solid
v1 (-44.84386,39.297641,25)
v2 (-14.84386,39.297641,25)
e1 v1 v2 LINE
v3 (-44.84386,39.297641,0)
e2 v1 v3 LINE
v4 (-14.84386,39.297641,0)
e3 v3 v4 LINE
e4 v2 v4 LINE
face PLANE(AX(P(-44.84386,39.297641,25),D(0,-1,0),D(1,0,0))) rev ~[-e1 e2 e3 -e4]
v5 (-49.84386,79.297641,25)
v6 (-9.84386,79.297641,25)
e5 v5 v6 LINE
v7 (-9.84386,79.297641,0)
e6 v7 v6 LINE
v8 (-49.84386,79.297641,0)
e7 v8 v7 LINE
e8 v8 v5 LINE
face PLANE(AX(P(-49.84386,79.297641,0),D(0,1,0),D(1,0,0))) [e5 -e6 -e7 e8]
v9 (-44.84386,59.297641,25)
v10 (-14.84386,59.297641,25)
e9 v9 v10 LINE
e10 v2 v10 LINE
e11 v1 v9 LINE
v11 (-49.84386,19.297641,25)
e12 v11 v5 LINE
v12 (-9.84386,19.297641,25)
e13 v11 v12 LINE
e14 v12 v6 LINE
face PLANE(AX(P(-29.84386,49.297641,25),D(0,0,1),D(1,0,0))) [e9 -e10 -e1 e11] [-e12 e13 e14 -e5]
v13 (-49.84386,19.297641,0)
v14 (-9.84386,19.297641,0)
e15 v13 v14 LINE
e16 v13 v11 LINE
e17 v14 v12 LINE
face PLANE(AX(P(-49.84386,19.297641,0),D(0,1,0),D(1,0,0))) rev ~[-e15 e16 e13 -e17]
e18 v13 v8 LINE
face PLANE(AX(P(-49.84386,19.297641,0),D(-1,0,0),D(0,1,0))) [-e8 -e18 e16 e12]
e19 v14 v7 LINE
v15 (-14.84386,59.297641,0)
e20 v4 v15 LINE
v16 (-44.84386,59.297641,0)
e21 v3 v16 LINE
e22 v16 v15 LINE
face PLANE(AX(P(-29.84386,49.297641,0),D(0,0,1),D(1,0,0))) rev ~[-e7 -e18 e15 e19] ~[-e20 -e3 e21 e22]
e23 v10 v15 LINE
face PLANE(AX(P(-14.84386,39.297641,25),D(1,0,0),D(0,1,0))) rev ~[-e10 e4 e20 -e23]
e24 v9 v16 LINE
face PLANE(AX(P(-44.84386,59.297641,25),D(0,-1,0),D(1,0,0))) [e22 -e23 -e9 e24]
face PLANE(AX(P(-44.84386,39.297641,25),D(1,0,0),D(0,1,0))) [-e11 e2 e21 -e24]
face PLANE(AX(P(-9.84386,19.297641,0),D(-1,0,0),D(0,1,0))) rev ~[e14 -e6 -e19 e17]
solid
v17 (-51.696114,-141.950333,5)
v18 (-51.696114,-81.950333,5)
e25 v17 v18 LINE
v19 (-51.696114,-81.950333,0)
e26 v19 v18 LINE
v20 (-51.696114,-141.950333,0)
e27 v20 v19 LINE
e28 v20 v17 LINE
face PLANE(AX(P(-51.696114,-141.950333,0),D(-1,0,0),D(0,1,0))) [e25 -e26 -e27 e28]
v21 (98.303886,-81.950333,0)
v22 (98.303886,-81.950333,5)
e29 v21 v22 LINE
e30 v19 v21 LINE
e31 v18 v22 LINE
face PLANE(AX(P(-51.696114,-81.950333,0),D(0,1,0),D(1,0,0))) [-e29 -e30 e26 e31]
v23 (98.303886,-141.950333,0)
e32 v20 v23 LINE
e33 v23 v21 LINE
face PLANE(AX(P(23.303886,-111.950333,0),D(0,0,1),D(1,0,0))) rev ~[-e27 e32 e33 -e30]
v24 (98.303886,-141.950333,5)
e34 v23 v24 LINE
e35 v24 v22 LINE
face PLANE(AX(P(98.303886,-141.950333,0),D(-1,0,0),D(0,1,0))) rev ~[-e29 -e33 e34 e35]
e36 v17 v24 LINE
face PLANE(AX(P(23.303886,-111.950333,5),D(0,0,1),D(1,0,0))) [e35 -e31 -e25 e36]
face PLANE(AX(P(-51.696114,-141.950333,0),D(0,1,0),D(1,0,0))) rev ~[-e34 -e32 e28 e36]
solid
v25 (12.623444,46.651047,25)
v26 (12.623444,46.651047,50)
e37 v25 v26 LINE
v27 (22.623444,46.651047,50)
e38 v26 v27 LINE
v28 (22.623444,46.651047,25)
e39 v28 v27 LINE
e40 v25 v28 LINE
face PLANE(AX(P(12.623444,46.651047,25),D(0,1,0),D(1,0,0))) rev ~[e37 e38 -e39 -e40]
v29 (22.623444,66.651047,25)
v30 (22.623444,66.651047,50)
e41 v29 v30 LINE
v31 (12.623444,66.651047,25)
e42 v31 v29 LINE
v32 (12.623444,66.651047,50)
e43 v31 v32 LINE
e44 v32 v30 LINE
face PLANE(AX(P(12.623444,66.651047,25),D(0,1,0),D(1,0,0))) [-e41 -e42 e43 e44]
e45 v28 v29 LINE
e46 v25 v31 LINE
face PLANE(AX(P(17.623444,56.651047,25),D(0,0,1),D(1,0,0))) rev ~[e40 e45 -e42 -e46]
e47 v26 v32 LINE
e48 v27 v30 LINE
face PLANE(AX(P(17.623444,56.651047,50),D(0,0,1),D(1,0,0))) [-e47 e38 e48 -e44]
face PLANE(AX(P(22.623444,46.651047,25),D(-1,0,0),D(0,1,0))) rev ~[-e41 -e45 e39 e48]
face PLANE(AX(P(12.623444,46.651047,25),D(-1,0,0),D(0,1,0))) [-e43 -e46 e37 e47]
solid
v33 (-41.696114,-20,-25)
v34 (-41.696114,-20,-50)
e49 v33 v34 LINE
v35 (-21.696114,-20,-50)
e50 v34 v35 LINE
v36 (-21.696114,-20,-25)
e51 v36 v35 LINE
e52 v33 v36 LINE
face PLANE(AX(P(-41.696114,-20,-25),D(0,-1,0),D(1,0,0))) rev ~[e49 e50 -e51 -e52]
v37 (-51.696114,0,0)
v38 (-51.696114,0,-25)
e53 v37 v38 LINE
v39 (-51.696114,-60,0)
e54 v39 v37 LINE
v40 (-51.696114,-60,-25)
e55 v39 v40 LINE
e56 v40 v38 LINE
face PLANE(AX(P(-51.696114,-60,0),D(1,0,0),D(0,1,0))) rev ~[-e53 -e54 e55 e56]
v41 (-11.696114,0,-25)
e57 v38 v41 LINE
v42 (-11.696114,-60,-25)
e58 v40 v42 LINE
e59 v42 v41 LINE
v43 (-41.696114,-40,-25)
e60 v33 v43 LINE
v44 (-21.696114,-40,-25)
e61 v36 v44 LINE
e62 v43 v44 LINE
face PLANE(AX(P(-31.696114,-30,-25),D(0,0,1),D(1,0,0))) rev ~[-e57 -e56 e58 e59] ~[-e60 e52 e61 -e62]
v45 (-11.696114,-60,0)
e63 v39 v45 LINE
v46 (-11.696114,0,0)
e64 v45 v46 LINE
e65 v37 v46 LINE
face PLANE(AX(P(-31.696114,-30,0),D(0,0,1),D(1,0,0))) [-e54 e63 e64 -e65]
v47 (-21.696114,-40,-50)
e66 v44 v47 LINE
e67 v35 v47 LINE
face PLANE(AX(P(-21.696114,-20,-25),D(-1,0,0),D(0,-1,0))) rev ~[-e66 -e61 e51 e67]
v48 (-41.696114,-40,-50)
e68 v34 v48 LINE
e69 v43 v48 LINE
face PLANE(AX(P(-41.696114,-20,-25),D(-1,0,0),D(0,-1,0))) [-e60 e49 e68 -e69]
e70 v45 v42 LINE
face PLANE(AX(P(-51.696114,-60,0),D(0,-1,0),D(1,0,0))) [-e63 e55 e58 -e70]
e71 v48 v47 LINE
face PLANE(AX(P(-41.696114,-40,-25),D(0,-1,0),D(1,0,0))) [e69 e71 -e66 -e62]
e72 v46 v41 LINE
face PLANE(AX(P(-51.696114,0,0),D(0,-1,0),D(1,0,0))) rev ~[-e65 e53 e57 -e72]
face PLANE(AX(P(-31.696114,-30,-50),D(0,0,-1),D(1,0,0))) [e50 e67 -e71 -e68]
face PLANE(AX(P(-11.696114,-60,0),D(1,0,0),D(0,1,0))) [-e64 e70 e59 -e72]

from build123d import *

# Parameters (mm, degrees)
F0_W     = 40
F0_H     = 60
F1_DEPTH = 25
F2_W     = 30
F2_H     = 20
F3_DEPTH = 25
F4_DEPTH = 25
F0_W_2   = 150
F5_DEPTH = 5
F7_W     = 20
F7_H     = 20
F8_DEPTH = 25
F2_W_2   = 10
F9_DEPTH = 25


# Not quite as in the source:
# - a feature names something its author has since deleted; it is built from what else it names


with BuildPart() as f1:
    # F0 (on Top) → F1 (new body)
    with BuildSketch(Plane.XY):
        with Locations((-29.8438598402, 49.2976413488)):
            Rectangle(F0_W, F0_H)
    extrude(amount=F1_DEPTH)

    # F2 (on face) → F3 (cut)
    with BuildSketch(Plane.XY.offset(25)):
        with Locations((-29.8438598402, 49.2976413488)):
            Rectangle(F2_W, F2_H)
    extrude(amount=-F3_DEPTH, mode=Mode.SUBTRACT)


with BuildPart() as f4:
    # F0 (on Top) → F4 (new body)
    with BuildSketch(Plane.XY):
        with Locations((-31.6961142421, -30)):
            Rectangle(F0_W, F0_H)
    extrude(amount=-F4_DEPTH)

    # F7 (on face) → F8 (join)
    with BuildSketch(Plane(origin=(0, 0, -25), x_dir=(1, 0, 0), z_dir=(0, 0, -1))):
        with Locations((-31.6961142421, 30)):
            Rectangle(F7_W, F7_H)
    extrude(amount=F8_DEPTH)


with BuildPart() as f5:
    # F0 (on Top) → F5 (new body)
    with BuildSketch(Plane.XY):
        with Locations((23.3038857579, -111.950333491)):
            Rectangle(F0_W_2, F0_H)
    extrude(amount=F5_DEPTH)


with BuildPart() as f9:
    # F2 (on face) → F9 (new body)
    with BuildSketch(Plane.XY.offset(25)):
        with Locations((17.6234441996, 56.6510467231)):
            Rectangle(F2_W_2, F2_H)
    extrude(amount=F9_DEPTH)


solid = Compound([f1.part, f4.part, f5.part, f9.part])
